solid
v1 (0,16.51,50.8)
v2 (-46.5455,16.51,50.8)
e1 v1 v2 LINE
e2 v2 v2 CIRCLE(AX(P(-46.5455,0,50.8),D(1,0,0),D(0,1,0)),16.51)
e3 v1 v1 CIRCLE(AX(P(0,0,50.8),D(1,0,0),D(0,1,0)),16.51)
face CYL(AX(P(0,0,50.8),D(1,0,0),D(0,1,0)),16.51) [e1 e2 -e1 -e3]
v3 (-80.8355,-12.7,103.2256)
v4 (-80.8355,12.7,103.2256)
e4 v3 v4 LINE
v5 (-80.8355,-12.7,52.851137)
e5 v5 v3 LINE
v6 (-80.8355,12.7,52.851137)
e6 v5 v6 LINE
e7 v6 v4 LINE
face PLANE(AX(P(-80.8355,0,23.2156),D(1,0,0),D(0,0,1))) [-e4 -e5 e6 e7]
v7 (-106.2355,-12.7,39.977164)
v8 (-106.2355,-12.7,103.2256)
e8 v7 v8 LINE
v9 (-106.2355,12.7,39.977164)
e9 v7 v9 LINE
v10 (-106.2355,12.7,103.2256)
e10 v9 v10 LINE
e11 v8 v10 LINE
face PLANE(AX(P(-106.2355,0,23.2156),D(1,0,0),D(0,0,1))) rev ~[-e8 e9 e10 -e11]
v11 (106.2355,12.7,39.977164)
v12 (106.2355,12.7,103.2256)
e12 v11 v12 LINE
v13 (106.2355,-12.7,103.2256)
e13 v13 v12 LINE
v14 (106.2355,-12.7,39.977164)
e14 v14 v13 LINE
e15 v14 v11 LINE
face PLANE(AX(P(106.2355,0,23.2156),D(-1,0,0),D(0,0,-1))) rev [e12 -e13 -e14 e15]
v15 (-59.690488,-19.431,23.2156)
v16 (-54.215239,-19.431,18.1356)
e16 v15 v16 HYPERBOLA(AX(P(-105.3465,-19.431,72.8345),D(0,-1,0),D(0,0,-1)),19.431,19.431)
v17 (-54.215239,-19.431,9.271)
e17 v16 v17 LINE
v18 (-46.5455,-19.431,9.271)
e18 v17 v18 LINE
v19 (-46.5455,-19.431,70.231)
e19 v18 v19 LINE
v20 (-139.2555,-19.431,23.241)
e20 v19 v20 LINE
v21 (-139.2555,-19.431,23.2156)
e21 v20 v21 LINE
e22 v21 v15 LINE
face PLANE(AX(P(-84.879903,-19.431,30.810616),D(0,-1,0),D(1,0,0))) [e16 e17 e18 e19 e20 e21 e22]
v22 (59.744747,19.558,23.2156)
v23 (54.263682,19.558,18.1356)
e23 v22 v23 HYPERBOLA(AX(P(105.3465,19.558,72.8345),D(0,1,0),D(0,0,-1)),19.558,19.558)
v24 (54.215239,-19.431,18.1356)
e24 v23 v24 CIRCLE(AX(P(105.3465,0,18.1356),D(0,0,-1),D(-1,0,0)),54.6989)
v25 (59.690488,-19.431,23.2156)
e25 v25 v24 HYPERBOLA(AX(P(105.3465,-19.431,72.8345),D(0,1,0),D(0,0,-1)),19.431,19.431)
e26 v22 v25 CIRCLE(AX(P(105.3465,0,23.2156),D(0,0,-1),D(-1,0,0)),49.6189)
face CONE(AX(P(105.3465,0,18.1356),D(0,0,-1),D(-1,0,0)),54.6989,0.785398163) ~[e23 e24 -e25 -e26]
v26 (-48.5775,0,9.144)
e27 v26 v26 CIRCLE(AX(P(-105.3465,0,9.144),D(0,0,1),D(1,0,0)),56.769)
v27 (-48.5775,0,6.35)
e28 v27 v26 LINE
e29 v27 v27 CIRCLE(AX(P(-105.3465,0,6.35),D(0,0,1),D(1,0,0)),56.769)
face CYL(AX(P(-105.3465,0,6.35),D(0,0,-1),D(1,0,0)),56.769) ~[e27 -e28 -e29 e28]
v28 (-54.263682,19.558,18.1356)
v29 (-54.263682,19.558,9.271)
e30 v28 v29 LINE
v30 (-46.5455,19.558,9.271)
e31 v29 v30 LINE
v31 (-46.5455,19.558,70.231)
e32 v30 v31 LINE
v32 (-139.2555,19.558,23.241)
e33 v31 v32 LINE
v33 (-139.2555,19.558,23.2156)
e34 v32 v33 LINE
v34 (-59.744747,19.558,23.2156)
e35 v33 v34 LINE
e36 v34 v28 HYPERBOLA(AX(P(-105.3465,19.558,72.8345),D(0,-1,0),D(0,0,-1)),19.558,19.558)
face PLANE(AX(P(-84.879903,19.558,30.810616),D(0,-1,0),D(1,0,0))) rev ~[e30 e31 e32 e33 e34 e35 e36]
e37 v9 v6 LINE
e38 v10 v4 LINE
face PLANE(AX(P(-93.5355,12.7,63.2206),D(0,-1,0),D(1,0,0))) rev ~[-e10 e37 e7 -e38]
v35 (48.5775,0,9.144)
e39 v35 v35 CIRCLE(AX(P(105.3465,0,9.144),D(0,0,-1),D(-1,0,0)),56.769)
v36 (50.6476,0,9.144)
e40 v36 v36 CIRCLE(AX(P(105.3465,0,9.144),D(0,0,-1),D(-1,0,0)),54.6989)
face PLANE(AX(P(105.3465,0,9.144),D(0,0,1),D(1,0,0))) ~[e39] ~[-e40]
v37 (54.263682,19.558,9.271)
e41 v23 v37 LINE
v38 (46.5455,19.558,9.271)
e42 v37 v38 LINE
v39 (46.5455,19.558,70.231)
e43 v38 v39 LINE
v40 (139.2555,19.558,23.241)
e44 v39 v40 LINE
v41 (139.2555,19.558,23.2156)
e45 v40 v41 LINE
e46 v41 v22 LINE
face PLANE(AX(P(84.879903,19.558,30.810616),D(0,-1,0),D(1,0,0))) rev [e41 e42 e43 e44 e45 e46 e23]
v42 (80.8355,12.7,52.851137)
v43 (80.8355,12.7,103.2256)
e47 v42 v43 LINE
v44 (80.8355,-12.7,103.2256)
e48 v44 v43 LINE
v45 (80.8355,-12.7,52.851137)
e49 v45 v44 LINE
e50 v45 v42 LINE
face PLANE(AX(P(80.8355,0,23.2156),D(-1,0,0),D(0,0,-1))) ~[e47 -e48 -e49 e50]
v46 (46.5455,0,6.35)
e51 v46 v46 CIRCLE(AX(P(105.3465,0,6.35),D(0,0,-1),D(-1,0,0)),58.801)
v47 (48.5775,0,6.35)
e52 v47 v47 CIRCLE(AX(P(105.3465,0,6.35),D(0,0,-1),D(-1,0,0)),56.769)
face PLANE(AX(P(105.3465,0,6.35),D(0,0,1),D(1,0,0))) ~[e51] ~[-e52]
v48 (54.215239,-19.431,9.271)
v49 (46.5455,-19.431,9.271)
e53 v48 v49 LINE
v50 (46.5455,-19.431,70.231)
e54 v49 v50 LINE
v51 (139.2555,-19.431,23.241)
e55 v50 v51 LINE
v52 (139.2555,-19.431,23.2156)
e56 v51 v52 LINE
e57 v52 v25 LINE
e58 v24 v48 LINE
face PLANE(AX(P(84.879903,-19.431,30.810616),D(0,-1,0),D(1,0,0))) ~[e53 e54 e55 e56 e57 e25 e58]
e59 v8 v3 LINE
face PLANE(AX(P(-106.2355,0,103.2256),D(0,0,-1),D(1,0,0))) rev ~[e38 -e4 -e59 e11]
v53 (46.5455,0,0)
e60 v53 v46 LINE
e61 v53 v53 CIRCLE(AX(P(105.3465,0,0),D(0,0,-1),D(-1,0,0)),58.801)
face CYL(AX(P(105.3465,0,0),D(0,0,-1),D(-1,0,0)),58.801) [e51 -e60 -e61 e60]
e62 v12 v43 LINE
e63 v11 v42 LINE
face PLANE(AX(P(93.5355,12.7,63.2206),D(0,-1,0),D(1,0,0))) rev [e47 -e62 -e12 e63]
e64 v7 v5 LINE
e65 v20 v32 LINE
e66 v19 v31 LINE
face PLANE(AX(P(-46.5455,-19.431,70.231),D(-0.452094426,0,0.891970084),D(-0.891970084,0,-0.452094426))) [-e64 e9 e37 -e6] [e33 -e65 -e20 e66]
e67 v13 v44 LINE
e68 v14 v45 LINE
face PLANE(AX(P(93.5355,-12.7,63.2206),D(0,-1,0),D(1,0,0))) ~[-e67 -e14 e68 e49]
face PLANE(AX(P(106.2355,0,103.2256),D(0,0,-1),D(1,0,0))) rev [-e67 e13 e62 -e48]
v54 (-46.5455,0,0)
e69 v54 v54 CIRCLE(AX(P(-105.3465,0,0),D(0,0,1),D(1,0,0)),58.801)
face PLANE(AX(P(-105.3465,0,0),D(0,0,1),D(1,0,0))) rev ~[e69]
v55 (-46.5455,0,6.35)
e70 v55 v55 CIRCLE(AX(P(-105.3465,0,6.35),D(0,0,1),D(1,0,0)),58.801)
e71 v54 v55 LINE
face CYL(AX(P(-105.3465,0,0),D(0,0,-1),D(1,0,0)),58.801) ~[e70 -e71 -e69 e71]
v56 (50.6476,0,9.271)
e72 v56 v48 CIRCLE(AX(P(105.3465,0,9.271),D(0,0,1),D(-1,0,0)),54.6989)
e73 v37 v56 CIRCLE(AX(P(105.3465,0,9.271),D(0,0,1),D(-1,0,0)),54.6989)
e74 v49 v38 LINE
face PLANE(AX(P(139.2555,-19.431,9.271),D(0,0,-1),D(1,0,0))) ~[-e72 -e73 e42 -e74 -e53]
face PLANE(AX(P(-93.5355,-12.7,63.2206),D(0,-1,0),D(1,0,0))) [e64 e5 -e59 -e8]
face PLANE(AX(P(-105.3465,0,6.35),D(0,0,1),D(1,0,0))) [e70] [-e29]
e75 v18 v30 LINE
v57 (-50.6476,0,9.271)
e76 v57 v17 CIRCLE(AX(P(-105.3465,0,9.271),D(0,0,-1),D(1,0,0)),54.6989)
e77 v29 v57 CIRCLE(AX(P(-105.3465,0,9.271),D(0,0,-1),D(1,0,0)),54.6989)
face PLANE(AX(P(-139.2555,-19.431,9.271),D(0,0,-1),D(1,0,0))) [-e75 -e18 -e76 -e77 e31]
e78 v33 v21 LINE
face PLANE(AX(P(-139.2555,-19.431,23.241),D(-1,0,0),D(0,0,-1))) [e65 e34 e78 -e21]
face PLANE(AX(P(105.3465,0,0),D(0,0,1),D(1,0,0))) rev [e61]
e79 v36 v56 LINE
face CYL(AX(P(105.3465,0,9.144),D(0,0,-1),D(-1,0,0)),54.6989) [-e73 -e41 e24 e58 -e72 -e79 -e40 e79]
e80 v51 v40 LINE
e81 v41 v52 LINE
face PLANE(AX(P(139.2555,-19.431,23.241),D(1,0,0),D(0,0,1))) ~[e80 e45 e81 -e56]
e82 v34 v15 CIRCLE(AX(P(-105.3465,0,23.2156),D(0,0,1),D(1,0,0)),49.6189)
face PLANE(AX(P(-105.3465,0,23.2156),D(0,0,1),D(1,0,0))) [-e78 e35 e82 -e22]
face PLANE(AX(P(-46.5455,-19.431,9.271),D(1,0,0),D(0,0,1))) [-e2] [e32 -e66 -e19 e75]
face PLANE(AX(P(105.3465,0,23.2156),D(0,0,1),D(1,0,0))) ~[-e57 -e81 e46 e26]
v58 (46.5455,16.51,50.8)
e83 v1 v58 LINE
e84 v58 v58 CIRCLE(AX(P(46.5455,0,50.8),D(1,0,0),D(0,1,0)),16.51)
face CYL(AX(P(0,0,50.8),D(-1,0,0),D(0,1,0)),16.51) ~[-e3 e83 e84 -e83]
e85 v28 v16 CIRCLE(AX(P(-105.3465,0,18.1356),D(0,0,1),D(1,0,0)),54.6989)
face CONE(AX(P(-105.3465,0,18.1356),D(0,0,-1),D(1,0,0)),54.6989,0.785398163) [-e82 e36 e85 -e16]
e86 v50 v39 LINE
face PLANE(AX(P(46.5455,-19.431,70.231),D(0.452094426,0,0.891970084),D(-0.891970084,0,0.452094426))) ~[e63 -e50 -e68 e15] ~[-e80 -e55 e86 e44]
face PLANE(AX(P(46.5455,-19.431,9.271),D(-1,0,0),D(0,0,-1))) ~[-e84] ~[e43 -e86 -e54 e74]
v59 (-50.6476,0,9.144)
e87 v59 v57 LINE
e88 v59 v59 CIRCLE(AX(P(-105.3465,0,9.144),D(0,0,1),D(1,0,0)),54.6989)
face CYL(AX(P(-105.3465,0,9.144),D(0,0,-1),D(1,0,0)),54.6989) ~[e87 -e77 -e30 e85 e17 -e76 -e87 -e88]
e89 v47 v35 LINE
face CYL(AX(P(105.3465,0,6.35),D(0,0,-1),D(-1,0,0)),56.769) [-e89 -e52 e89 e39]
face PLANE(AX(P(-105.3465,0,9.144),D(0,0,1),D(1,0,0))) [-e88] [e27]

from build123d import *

# Parameters (mm, degrees)
F0_R      = 58.801
F1_DEPTH  = 6.35
F3_R      = 56.769
F4_DEPTH  = 2.794
F5_R      = 54.6989
F6_DEPTH  = 14.0716
F7_SIZE   = 5.08
F9_DEPTH  = 38.989
F10_R     = 16.51
F11_DEPTH = 46.5455
F12_W     = 25.4
F12_H     = 80.01
F13_DEPTH = 12.7


# Not quite as in the source:
# - a length typed as a fraction of an inch, garbled in the dataset ("3 / 203.2 mm" for 3/8 in), is restored


with BuildPart() as f1:
    # F0 (on Top) → F1 (new body)
    with BuildSketch(Plane.XY):
        with Locations((-105.3465, 0)):
            Circle(F0_R)
    extrude(amount=F1_DEPTH)

    # F3 (on face) → F4 (join)
    with BuildSketch(Plane.XY.offset(6.35)):
        with Locations((-105.3465, 0)):
            Circle(F3_R)
    extrude(amount=F4_DEPTH)

    # F5 (on face) → F6 (join)
    with BuildSketch(Plane.XY.offset(9.144)):
        with Locations((-105.3465, 0)):
            Circle(F5_R)
    extrude(amount=F6_DEPTH)

    # F7
    f7_edges = [f1.edges().sort_by_distance(p)[0] for p in [
        (-160.0454, 0, 23.2156),
    ]]
    chamfer(f7_edges, length=F7_SIZE)

    # F8 (on offset) → F9 (join)
    with BuildSketch(Plane.XZ.offset(19.431)):
        Polygon((-139.2555, 9.271), (-46.5455, 9.271), (-46.5455, 70.231), (-139.2555, 23.241), align=None)
    extrude(amount=-F9_DEPTH)

    # F10 (on Right) → F11 (join, through all)
    with BuildSketch(Plane.YZ):
        with Locations((0, 50.8)):
            Circle(F10_R)
    extrude(amount=-F11_DEPTH)

    # F12 (on Front) → F13 (join, symmetric)
    with BuildSketch(Plane.XZ):
        with Locations((-93.5355, 63.2206)):
            Rectangle(F12_W, F12_H)
    extrude(amount=F13_DEPTH, both=True)

    # F14: F1 across plane


with BuildPart() as f1_1:
    add(f1.part)
    add(f1.part.mirror(Plane.YZ))


solid = f1_1.part
